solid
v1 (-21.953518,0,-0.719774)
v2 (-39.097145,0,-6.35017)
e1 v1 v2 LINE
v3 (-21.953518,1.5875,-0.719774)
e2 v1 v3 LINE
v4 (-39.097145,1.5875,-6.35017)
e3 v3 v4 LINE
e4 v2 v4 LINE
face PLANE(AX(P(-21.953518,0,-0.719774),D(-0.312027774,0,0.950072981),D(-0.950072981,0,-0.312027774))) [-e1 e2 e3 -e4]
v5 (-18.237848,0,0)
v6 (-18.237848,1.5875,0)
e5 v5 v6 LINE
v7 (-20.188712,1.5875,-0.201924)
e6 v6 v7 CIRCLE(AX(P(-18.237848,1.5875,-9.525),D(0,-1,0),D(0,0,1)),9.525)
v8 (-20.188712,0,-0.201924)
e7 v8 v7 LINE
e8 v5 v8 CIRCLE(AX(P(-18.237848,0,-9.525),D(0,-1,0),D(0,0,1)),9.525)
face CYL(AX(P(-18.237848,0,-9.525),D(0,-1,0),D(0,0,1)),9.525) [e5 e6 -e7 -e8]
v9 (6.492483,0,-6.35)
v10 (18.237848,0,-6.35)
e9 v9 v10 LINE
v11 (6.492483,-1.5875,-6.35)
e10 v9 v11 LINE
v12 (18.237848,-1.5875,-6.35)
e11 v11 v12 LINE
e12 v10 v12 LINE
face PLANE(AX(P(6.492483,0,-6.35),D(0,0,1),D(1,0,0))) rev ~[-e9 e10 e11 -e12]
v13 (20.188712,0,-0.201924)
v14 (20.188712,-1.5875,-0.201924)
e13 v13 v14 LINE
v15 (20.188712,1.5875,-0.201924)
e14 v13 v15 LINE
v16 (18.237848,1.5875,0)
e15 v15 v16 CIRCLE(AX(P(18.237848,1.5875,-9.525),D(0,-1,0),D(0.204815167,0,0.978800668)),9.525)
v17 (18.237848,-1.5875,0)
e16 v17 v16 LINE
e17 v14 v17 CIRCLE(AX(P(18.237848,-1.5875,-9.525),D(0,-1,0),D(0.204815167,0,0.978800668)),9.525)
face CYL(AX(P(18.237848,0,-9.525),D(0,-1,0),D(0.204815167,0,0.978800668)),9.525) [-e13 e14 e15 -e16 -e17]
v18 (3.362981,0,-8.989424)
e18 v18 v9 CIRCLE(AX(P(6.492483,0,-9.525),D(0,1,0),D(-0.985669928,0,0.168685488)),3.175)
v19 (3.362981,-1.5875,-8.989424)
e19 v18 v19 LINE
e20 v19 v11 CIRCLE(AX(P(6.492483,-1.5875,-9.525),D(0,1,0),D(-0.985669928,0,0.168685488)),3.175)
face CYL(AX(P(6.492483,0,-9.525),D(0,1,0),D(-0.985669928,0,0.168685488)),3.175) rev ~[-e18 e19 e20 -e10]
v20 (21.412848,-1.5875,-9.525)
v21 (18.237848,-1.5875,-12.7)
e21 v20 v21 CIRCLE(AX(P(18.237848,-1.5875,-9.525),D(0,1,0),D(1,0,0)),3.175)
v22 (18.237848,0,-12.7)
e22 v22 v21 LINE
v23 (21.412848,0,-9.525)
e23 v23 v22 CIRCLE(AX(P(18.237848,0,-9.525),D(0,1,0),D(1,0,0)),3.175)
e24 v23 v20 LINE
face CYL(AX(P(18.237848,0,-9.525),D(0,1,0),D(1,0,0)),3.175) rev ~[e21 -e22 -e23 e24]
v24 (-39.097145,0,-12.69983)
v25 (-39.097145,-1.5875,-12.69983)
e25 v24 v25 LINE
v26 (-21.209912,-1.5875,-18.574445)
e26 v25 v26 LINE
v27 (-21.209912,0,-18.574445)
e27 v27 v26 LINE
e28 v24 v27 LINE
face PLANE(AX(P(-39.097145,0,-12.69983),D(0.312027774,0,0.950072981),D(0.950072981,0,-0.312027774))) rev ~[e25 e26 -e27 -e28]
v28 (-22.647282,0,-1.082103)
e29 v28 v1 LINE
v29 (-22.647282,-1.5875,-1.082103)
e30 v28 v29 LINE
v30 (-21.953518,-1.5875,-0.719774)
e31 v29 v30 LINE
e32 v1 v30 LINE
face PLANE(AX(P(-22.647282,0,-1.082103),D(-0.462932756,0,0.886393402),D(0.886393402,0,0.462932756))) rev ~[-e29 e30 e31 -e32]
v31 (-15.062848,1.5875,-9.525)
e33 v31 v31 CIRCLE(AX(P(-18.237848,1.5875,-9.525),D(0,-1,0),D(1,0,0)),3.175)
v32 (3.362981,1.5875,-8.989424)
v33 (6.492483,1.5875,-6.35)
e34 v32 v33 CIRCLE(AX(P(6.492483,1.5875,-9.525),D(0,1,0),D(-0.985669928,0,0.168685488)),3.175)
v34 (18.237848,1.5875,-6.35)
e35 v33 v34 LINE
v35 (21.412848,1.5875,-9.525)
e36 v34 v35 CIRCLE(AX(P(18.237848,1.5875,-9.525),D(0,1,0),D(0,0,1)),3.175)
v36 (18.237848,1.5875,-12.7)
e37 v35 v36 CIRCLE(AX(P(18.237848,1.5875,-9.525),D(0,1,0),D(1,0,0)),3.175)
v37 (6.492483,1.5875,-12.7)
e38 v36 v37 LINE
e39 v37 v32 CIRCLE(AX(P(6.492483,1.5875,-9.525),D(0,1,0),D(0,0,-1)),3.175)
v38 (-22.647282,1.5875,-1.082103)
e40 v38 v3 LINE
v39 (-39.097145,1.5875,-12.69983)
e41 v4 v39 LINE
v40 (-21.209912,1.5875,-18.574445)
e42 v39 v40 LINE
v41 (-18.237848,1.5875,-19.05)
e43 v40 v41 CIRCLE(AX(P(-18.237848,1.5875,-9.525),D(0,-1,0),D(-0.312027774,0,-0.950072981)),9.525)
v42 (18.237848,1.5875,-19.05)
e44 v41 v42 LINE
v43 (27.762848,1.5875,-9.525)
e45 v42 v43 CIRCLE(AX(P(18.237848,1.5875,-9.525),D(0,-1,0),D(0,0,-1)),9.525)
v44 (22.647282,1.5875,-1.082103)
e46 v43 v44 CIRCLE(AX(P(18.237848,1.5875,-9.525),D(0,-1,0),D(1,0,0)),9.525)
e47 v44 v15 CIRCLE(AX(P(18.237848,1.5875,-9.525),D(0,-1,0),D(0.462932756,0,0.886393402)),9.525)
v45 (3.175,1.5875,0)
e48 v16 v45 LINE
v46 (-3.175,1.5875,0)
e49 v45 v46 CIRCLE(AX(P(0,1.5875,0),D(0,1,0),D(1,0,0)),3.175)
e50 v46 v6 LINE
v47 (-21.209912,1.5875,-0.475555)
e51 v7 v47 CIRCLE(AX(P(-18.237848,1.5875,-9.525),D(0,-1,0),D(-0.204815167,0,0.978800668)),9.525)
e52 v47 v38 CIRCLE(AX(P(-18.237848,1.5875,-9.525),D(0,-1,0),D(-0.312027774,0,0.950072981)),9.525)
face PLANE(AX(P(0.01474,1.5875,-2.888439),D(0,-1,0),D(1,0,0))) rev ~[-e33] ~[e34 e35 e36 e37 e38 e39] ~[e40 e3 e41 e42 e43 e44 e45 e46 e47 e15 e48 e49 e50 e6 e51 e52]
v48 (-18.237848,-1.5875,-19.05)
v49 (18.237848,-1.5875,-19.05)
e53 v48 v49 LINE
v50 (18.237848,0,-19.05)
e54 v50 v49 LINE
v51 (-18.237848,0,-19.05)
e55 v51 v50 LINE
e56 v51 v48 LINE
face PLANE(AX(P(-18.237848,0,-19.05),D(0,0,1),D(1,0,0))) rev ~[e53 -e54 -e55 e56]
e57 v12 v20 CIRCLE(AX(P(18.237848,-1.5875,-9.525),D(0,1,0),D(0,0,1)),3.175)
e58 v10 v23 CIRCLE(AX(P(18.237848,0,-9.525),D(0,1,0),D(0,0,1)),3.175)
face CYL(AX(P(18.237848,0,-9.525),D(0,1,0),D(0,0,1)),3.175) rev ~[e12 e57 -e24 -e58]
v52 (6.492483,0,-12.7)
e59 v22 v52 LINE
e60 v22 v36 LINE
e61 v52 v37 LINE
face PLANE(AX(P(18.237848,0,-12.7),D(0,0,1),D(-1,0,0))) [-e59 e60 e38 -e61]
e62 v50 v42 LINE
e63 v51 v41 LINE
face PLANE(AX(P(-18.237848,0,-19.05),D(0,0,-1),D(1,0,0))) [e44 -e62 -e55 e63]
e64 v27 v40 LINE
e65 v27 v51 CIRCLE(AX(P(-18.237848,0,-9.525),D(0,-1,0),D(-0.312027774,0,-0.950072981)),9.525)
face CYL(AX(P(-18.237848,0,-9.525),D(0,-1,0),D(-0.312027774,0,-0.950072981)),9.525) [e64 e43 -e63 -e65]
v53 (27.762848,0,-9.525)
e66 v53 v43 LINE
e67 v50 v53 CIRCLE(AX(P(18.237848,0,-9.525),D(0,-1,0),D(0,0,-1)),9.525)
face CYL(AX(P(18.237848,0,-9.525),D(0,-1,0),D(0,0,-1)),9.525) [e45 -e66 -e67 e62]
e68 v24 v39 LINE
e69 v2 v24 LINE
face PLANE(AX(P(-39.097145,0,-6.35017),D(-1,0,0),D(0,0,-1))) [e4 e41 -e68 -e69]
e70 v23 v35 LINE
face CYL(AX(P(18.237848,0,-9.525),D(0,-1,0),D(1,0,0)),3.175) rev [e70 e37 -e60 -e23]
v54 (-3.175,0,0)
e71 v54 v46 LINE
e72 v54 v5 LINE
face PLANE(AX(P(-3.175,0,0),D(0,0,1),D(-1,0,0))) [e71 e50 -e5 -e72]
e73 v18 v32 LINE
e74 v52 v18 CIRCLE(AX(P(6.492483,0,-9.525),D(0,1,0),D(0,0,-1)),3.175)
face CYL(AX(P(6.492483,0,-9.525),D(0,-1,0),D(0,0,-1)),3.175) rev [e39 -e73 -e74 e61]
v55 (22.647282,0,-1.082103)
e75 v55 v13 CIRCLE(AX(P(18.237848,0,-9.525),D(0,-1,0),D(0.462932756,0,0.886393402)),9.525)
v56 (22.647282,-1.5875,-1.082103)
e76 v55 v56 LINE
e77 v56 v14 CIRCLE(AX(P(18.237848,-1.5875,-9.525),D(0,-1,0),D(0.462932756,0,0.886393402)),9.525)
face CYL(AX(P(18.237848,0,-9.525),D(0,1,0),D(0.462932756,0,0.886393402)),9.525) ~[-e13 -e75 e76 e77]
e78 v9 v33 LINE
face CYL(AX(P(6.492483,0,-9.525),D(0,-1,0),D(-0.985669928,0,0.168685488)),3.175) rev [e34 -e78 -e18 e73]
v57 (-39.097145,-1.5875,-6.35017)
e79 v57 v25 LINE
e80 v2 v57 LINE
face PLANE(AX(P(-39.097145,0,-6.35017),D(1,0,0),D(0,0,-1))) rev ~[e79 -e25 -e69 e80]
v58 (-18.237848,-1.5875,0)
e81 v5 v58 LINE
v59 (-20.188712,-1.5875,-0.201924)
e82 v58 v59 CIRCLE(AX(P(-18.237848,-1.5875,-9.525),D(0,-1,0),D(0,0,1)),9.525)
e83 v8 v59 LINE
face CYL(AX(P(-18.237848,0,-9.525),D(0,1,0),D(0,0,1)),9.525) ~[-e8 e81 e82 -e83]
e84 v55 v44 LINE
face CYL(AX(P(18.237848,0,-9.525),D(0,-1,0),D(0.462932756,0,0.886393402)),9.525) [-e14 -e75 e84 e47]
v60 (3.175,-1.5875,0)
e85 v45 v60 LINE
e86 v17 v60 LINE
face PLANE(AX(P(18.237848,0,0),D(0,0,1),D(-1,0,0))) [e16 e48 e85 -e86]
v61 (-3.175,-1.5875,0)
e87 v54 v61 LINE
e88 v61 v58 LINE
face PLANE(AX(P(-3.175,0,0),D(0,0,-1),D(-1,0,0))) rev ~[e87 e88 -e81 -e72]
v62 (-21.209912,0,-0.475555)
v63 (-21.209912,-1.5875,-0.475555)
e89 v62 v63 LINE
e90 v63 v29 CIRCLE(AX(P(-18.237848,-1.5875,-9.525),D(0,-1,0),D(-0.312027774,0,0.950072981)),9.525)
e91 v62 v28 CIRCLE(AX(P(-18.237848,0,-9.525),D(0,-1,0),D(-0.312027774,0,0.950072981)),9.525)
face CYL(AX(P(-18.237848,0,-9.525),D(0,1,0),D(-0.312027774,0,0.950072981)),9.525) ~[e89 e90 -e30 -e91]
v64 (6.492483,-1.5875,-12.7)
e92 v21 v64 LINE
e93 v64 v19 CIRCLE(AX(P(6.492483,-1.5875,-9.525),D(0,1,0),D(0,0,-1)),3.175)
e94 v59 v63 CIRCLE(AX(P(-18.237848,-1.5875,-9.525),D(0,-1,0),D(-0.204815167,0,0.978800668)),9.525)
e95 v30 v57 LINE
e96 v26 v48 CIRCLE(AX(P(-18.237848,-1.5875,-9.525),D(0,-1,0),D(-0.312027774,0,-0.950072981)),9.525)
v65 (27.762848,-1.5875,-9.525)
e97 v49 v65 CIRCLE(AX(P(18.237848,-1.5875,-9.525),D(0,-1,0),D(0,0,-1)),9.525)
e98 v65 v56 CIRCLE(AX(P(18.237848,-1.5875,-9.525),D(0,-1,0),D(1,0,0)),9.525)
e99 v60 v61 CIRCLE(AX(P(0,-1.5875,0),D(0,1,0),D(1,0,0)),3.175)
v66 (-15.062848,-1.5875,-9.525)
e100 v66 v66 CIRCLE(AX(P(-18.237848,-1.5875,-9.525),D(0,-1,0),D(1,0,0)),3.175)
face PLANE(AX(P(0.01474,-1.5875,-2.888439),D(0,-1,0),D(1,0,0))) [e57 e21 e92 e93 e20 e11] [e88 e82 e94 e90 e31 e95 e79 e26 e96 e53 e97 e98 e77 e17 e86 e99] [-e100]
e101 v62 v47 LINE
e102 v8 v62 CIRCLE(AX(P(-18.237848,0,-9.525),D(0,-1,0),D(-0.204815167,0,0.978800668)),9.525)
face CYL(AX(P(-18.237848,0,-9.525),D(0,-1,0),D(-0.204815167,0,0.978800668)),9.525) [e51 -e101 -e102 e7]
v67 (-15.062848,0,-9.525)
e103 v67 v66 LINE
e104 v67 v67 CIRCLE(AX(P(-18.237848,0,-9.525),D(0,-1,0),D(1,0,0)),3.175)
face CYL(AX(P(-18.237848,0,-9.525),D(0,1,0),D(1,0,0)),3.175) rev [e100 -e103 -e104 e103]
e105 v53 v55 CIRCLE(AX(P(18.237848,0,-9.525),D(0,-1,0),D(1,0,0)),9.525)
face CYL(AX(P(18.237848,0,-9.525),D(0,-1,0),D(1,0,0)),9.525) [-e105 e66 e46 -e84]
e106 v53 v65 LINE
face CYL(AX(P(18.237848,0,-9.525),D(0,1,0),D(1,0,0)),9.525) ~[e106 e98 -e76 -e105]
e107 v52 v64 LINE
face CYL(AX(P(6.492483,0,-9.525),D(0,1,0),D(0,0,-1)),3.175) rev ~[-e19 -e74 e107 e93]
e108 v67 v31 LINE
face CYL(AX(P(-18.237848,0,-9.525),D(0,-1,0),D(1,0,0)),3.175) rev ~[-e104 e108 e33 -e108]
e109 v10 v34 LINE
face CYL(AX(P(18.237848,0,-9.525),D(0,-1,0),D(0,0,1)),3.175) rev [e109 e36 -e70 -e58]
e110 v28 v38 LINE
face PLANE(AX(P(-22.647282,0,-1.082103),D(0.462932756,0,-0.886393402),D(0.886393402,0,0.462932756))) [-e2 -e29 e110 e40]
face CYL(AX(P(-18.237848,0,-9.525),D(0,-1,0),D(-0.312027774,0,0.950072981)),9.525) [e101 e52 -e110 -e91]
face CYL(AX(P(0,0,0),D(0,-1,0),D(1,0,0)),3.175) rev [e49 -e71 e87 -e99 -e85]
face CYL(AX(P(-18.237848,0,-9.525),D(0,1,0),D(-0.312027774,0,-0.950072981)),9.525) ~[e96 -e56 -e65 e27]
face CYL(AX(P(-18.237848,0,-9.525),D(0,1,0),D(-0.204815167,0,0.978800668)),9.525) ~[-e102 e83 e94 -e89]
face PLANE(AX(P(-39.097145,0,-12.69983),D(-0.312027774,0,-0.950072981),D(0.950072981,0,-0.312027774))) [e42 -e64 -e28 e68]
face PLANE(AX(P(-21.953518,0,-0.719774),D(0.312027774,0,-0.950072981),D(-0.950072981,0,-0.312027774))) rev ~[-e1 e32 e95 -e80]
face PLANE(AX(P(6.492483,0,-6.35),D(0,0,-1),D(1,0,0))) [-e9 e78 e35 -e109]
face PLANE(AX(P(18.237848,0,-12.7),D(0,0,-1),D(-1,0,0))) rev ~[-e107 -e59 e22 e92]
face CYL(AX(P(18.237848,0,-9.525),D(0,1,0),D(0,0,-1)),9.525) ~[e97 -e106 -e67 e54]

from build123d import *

# Parameters (mm, degrees)
F0_R     = 3.175
F1_DEPTH = 1.5875


with BuildPart() as f1:
    # F0 (on Front) → F1 (new body, symmetric)
    with BuildSketch(Plane.XZ):
        with BuildLine():
            Line((18.2378478348, 0), (3.175, 0))
            ThreePointArc((3.175, 0), (0, -3.175), (-3.175, 0))
            Line((-3.175, 0), (-18.2378478348, 0))
            ThreePointArc((-18.2378478348, 0), (-12.9826090881, -1.5809399099), (-9.4718777788, -5.7989573302))
            Line((-9.4718777788, -5.7989573302), (0, -10.7457929799))
            Line((0, -10.7457929799), (3.3629814094, -8.9894235763))
            ThreePointArc((3.3629814094, -8.9894235763), (4.4455137358, -7.0979565161), (6.4924834296, -6.35))
            Line((6.4924834296, -6.35), (8.4167772684, -6.35))
            Line((8.4167772684, -6.35), (9.4718777788, -5.7989573302))
            ThreePointArc((9.4718777788, -5.7989573302), (12.9826090881, -1.5809399099), (18.2378478348, 0))
        make_face()
        with BuildLine():
            ThreePointArc((20.1887122983, -0.2019236384), (19.2184911582, -0.0506153935), (18.2378478348, 0))
            ThreePointArc((18.2378478348, 0), (12.9826090881, -1.5809399099), (9.4718777788, -5.7989573302))
            Line((9.4718777788, -5.7989573302), (20.1887122983, -0.2019236384))
        make_face()
        with BuildLine():
            ThreePointArc((-9.4718777788, -5.7989573302), (-12.9826090881, -1.5809399099), (-18.2378478348, 0))
            ThreePointArc((-18.2378478348, 0), (-19.2184911582, -0.0506153935), (-20.1887122983, -0.2019236384))
            Line((-20.1887122983, -0.2019236384), (-9.4718777788, -5.7989573302))
        make_face()
        with BuildLine():
            ThreePointArc((22.6472823333, -1.082102843), (21.4483041232, -0.5573584248), (20.1887122983, -0.2019236384))
            Line((20.1887122983, -0.2019236384), (9.4718777788, -5.7989573302))
            ThreePointArc((9.4718777788, -5.7989573302), (9.3604581347, -6.0728156028), (9.2575917138, -6.35))
            Line((9.2575917138, -6.35), (18.2378478348, -6.35))
            ThreePointArc((18.2378478348, -6.35), (20.4829118651, -7.2799359697), (21.4128478348, -9.525))
            ThreePointArc((21.4128478348, -9.525), (20.4829118651, -11.7700640303), (18.2378478348, -12.7))
            Line((18.2378478348, -12.7), (9.2575917138, -12.7))
            ThreePointArc((9.2575917138, -12.7), (11.0435001343, -15.7673542165), (13.8284133364, -17.967897157))
            ThreePointArc((13.8284133364, -17.967897157), (15.9677124226, -18.7755194562), (18.2378478348, -19.05))
            ThreePointArc((18.2378478348, -19.05), (24.9730399256, -16.2601920908), (27.7628478348, -9.525))
            ThreePointArc((27.7628478348, -9.525), (26.384181016, -4.5891231072), (22.6472823333, -1.082102843))
        make_face()
        with BuildLine():
            ThreePointArc((9.2575917138, -6.35), (9.3604581347, -6.0728156028), (9.4718777788, -5.7989573302))
            Line((9.4718777788, -5.7989573302), (8.4167772684, -6.35))
            Line((8.4167772684, -6.35), (9.2575917138, -6.35))
        make_face()
        with BuildLine():
            Line((0, -10.7457929799), (-9.4718777788, -5.7989573302))
            ThreePointArc((-9.4718777788, -5.7989573302), (-8.9045341204, -7.6237161947), (-8.7128478348, -9.525))
            ThreePointArc((-8.7128478348, -9.525), (-10.0915146536, -14.4608768928), (-13.8284133364, -17.967897157))
            Line((-13.8284133364, -17.967897157), (0, -10.7457929799))
        make_face()
        with BuildLine():
            ThreePointArc((-8.7128478348, -9.525), (-8.9045341204, -7.6237161947), (-9.4718777788, -5.7989573302))
            Line((-9.4718777788, -5.7989573302), (-20.1887122983, -0.2019236384))
            ThreePointArc((-20.1887122983, -0.2019236384), (-20.7031117187, -0.3245598484), (-21.2099123798, -0.4755548601))
            ThreePointArc((-21.2099123798, -0.4755548601), (-21.9410366156, -0.7493508585), (-22.6472823333, -1.082102843))
            ThreePointArc((-22.6472823333, -1.082102843), (-27.7308527221, -10.3050533377), (-21.2099123798, -18.5744451399))
            ThreePointArc((-21.2099123798, -18.5744451399), (-19.7427830564, -18.9303599069), (-18.2378478348, -19.05))
            ThreePointArc((-18.2378478348, -19.05), (-15.9677124226, -18.7755194562), (-13.8284133364, -17.967897157))
            ThreePointArc((-13.8284133364, -17.967897157), (-10.0915146536, -14.4608768928), (-8.7128478348, -9.525))
        make_face()
        with Locations((-18.2378478348, -9.525)):
            Circle(F0_R, mode=Mode.SUBTRACT)
        with BuildLine():
            Line((13.8284133364, -17.967897157), (0, -10.7457929799))
            Line((0, -10.7457929799), (-13.8284133364, -17.967897157))
            ThreePointArc((-13.8284133364, -17.967897157), (-15.9677124226, -18.7755194562), (-18.2378478348, -19.05))
            Line((-18.2378478348, -19.05), (18.2378478348, -19.05))
            ThreePointArc((18.2378478348, -19.05), (15.9677124226, -18.7755194562), (13.8284133364, -17.967897157))
        make_face()
        with BuildLine():
            Line((3.3629814094, -8.9894235763), (0, -10.7457929799))
            Line((0, -10.7457929799), (13.8284133364, -17.967897157))
            ThreePointArc((13.8284133364, -17.967897157), (11.0435001343, -15.7673542165), (9.2575917138, -12.7))
            Line((9.2575917138, -12.7), (6.4924834296, -12.7))
            ThreePointArc((6.4924834296, -12.7), (4.0654399457, -11.5719696938), (3.3629814094, -8.9894235763))
        make_face()
        with BuildLine():
            Line((-22.6472823333, -1.082102843), (-21.9535177998, -0.7197735133))
            Line((-21.9535177998, -0.7197735133), (-39.097144814, -6.3501702098))
            Line((-39.097144814, -6.3501702098), (-39.097144814, -12.6998297902))
            Line((-39.097144814, -12.6998297902), (-21.2099123798, -18.5744451399))
            ThreePointArc((-21.2099123798, -18.5744451399), (-27.7308527221, -10.3050533377), (-22.6472823333, -1.082102843))
        make_face()
    extrude(amount=F1_DEPTH, both=True)


solid = f1.part
